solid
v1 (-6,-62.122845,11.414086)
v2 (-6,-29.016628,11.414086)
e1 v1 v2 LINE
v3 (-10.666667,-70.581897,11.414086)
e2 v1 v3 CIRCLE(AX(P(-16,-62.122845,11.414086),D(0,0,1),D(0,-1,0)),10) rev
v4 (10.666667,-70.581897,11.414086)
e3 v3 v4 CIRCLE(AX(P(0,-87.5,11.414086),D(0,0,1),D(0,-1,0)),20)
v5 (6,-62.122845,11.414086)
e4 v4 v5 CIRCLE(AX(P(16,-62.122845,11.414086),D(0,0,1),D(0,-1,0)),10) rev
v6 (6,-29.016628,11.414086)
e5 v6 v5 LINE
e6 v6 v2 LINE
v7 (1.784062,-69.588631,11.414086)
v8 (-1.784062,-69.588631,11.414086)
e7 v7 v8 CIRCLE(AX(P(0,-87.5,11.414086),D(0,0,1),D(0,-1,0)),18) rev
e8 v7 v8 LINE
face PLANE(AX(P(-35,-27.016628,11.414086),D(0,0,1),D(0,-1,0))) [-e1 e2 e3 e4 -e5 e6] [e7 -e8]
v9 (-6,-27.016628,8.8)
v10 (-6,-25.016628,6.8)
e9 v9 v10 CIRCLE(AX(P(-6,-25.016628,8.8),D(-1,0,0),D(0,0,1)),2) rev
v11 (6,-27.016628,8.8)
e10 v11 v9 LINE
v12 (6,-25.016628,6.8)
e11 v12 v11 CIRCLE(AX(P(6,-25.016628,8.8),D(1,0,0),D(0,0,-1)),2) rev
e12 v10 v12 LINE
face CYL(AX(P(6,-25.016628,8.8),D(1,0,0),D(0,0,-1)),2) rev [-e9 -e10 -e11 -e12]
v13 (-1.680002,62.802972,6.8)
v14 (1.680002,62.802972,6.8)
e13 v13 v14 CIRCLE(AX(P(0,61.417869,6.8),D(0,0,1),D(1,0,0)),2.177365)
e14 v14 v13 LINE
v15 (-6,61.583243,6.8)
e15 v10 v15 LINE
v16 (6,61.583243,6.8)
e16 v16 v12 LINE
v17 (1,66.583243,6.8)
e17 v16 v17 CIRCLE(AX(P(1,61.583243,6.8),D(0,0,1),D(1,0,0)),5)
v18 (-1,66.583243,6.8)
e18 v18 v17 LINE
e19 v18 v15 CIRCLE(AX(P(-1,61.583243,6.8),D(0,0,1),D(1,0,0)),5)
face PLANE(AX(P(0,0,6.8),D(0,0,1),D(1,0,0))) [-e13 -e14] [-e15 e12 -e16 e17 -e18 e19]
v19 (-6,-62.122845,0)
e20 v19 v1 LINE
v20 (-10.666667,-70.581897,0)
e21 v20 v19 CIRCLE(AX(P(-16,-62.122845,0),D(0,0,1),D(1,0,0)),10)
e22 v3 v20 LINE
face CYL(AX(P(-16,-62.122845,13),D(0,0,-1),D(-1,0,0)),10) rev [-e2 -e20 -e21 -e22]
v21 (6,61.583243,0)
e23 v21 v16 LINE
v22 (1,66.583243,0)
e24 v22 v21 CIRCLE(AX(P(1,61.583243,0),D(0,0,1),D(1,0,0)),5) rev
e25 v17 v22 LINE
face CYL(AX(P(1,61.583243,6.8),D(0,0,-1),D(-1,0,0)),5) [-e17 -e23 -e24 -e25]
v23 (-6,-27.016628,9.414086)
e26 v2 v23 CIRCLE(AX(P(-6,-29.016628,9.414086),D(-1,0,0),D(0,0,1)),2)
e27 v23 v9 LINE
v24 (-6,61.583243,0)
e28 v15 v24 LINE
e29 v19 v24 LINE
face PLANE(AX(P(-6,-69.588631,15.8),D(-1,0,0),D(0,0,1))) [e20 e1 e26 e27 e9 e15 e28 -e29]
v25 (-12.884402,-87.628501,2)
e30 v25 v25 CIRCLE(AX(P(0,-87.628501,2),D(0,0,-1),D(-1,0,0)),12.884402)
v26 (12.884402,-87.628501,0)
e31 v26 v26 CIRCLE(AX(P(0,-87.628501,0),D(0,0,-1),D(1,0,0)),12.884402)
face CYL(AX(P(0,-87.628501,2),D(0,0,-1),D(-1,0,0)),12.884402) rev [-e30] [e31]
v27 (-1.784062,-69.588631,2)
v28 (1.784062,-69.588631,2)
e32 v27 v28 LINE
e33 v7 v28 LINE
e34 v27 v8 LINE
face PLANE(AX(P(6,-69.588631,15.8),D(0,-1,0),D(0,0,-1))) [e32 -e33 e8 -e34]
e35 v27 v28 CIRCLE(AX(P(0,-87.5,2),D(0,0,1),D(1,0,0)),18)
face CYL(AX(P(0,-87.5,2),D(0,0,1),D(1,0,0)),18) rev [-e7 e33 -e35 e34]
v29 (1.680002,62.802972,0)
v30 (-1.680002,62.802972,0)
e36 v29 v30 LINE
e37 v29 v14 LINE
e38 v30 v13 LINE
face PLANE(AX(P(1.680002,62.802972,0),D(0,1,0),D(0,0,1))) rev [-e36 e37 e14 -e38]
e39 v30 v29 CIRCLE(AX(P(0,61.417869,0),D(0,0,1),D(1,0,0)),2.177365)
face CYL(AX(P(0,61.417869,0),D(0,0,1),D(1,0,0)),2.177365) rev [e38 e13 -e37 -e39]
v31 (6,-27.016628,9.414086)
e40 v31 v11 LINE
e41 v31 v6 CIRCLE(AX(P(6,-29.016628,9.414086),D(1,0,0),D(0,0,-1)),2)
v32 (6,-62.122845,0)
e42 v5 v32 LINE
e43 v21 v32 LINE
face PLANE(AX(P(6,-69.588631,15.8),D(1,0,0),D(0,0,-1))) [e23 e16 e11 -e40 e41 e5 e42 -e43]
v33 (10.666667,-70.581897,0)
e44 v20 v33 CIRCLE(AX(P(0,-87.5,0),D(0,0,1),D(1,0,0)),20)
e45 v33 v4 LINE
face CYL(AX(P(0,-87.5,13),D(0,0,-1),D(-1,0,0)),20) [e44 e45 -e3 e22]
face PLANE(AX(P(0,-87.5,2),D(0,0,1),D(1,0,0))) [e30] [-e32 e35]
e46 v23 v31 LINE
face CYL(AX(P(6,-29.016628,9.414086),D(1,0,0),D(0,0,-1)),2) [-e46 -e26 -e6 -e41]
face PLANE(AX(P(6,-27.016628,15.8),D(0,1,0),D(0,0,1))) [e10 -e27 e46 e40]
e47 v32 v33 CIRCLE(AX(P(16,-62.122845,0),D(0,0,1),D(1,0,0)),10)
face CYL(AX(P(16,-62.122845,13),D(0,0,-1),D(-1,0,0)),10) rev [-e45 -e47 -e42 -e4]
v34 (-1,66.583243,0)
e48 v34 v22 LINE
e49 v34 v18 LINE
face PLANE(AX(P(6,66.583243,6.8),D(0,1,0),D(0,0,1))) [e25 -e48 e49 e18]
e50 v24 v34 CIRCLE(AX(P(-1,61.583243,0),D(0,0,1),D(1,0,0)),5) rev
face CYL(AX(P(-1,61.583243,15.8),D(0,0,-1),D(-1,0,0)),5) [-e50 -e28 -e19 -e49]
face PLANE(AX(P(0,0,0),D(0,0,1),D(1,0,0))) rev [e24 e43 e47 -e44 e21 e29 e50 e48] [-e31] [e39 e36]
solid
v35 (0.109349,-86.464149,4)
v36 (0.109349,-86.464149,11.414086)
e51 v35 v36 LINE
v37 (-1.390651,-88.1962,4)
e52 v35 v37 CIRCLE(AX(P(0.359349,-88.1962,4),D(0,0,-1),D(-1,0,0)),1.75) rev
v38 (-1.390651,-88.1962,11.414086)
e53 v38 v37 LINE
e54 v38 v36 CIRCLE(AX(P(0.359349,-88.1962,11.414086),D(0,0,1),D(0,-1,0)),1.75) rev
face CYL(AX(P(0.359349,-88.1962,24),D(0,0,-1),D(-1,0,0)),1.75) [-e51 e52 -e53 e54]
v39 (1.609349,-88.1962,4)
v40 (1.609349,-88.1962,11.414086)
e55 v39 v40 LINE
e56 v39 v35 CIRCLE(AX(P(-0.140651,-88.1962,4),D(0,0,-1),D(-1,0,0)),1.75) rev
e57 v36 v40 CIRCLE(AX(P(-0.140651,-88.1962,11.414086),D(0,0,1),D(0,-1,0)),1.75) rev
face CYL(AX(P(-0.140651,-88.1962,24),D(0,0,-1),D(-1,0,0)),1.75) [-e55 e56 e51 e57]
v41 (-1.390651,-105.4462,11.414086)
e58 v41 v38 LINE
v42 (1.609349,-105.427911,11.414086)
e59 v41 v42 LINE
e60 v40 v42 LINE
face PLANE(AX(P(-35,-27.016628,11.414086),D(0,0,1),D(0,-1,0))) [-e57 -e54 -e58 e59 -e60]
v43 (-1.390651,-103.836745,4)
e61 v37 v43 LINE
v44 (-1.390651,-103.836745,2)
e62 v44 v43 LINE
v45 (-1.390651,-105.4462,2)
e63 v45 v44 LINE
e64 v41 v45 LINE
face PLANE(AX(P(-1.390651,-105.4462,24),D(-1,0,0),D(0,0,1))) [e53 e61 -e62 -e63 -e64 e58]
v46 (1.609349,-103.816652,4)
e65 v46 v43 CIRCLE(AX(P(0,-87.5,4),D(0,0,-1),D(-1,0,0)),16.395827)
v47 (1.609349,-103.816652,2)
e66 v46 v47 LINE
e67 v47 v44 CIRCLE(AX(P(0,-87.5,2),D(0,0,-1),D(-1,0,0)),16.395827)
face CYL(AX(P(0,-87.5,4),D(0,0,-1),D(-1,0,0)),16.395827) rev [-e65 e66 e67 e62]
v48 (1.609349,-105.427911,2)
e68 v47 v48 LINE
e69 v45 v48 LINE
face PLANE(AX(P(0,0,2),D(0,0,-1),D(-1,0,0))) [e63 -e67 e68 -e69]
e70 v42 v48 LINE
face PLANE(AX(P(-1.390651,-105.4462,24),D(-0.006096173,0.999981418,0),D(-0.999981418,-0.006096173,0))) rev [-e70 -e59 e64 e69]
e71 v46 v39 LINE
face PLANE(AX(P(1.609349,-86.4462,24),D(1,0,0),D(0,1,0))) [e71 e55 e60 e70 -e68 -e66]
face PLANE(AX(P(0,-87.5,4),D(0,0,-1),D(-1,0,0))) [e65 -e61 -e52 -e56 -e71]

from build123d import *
from build123d.topology import SkipClean

# Parameters (mm, degrees)
BOSS_EXTRUDE1_DEPTH      = 13
BOSS_EXTRUDE1_2_DEPTH    = 13
BOSS_EXTRUDE2_DEPTH      = 13
CUT_EXTRUDE1_DEPTH       = 13
SKETCH3_W                = 6.626848164
SKETCH3_H                = 19.420298156
CUT_EXTRUDE2_DEPTH       = 13
FILLET1_R                = 10
SKETCH4_R                = 20
BOSS_EXTRUDE3_DEPTH      = 13
CUT_EXTRUDE3_DEPTH       = 13
SKETCH6_R                = 18
CUT_EXTRUDE4_DEPTH       = 24
BOSS_EXTRUDE7_DEPTH      = 22
FILLET5_R                = 1.75
FILLET6_R                = 20
SKETCH13_W               = 6.626848164
SKETCH13_H               = 84.326545424
CUT_EXTRUDE8_DEPTH       = 22
FILLET8_R                = 21.5
FILLET9_R                = 21.5
SKETCH14_W               = 17.060891399
SKETCH14_H               = 46.716771418
CUT_EXTRUDE10_DEPTH      = 22
SKETCH23_R               = 16.395826628
CUT_EXTRUDE14_DEPTH      = 4
BOSS_EXTRUDE16_DEPTH     = 2
SKETCH25_R               = 20.128500803
CUT_EXTRUDE15_DEPTH      = 9
SKETCH26_W               = 8.848519257
SKETCH26_H               = 26
CUT_EXTRUDE16_DEPTH      = 9
CUT_EXTRUDE17_DEPTH      = 9
FILLET21_R               = 3.5
SKETCH28_W               = 12
SKETCH28_H               = 42.572003563
BOSS_EXTRUDE20_DEPTH     = 15.8
BOSS_EXTRUDE21_START     = -6.8
SKETCH30_W               = 12
SKETCH30_H               = 93.599870645
BOSS_EXTRUDE21_DEPTH     = 6.8
FILLET23_R               = 5
BOSS_EXTRUDE22_DEPTH     = 6.8
CUT_EXTRUDE18_DEPTH      = 29
CUT_EXTRUDE18_DEPTH_BACK = 41
SKETCH34_W               = 5.585914081
SKETCH34_H               = 80.48337208
FILLET27_R               = 2
FILLET28_R               = 10
BOSS_EXTRUDE24_DEPTH     = 6.8


with BuildPart() as part:
    # Sketch1 → Boss-Extrude1 (new body)
    with BuildSketch(Plane.XY):
        with BuildLine():
            Line((4, -87.5), (-4, -87.5))
            Line((-4, -87.5), (-4, -67.904082058))
            ThreePointArc((-4, -67.904082058), (0, -107.5), (4, -67.904082058))
            Line((4, -67.904082058), (4, -87.5))
        make_face()
    extrude(amount=BOSS_EXTRUDE1_DEPTH)



with BuildPart() as body_2:
    # Sketch1 → Boss-Extrude1 2 (new body)
    with BuildSketch(Plane.XY):
        with BuildLine():
            Line((-4, 87.5), (-4, -67.904082058))
            ThreePointArc((-4, -67.904082058), (0, -67.5), (4, -67.904082058))
            Line((4, -67.904082058), (4, 87.5))
            ThreePointArc((4, 87.5), (0, 91.5), (-4, 87.5))
        make_face()
    extrude(amount=BOSS_EXTRUDE1_2_DEPTH)


with BuildPart() as part_1:
    add(part.part)

    add(body_2.part)  # Boss-Extrude2 merges body 2
    # Sketch1<3> → Boss-Extrude2 (add)
    with BuildSketch(Plane.XY):
        with BuildLine():
            Line((-4, -67.904082058), (-4, -87.5))
            Line((-4, -87.5), (4, -87.5))
            Line((4, -87.5), (4, -67.904082058))
            ThreePointArc((4, -67.904082058), (0, -67.5), (-4, -67.904082058))
        make_face()
        with BuildLine():
            Line((4, -87.5), (-4, -87.5))
            Line((-4, -87.5), (-4, -67.904082058))
            ThreePointArc((-4, -67.904082058), (-12.649110641, -102.991933385), (20, -87.5))
            ThreePointArc((20, -87.5), (15.491933385, -74.850889359), (4, -67.904082058))
            Line((4, -67.904082058), (4, -87.5))
        make_face()
    extrude(amount=BOSS_EXTRUDE2_DEPTH)

    # Sketch2 → Cut-Extrude1 (cut)
    with BuildSketch(Plane.XY.offset(13)):
        with BuildLine():
            Line((1.836704547, 90.02826846), (-1.836704547, 90.02826846))
            ThreePointArc((-1.836704547, 90.02826846), (-1.418788795, 84.715639507), (3.125, 87.5))
            ThreePointArc((3.125, 87.5), (2.784360493, 88.918788795), (1.836704547, 90.02826846))
        make_face()
    extrude(amount=-CUT_EXTRUDE1_DEPTH, mode=Mode.SUBTRACT)

    # Sketch3 → Cut-Extrude2 (cut)
    with BuildSketch(Plane(origin=(4, 0, 0), x_dir=(0, 0, -1), z_dir=(1, 0, 0))):
        with Locations((-9.686575918, 81.789850922)):
            Rectangle(SKETCH3_W, SKETCH3_H)
    extrude(amount=-CUT_EXTRUDE2_DEPTH, mode=Mode.SUBTRACT)

    # Fillet1
    # the kernel refuses this fillet: 10 mm, written as the material it adds along each edge
    with BuildSketch(Plane(origin=(4, 72.079701844, 6.373151836), x_dir=(0, 1, 0), z_dir=(-1, 0, 0))) as fillet1_piece_1:
        with BuildLine():
            CenterArc((9.413917712, -10), FILLET1_R, 90, 70.286615286)
            Line((0, -6.626848164), (-0.188278354, -6.559385127))
            ThreePointArc((-0.188278354, -6.559385127), (-0.2, -3.313424082), (-0.2, 0))
            Line((-0.2, 0), (0, 0.2))
            Line((0, 0.2), (9.413917712, 0.2))
            Line((9.413917712, 0.2), (9.413917712, 0))
        make_face()
    extrude(amount=8)

    # Sketch4 → Boss-Extrude3 (add)
    with BuildSketch(Plane.XY.offset(13)):
        with Locations(Location((0, -87.5, 0), (0, 0, 101.536959033))):
            Circle(SKETCH4_R)
    extrude(amount=BOSS_EXTRUDE3_DEPTH)

    # Sketch5 → Cut-Extrude3 (cut)
    with BuildSketch(Plane(origin=(4, 0, 0), x_dir=(0, 0, -1), z_dir=(1, 0, 0))):
        with BuildLine():
            Line((-13, 61.057159029), (-13, 87.5))
            Line((-13, 87.5), (-6.373151836, 87.5))
            ThreePointArc((-6.373151836, 87.5), (-7.529351989, 73.73795699), (-13, 61.057159029))
        make_face()
    extrude(amount=-CUT_EXTRUDE3_DEPTH, mode=Mode.SUBTRACT)

    # Sketch6 → Cut-Extrude4 (cut)
    with BuildSketch(Plane.XY.offset(26)):
        with Locations((0, -87.5)):
            Circle(SKETCH6_R)
    extrude(amount=-CUT_EXTRUDE4_DEPTH, mode=Mode.SUBTRACT)

    # Fillet6
    fillet6_edges = [part_1.edges().sort_by_distance(p)[0] for p in [
        (0, 61.057159029, 13),
    ]]
    fillet(fillet6_edges, radius=FILLET6_R)

    # Sketch13 → Cut-Extrude8 (cut)
    with BuildSketch(Plane.ZY.offset(4)):
        with Locations((9.686575918, 45.336727288)):
            Rectangle(SKETCH13_W, SKETCH13_H)
    extrude(amount=-CUT_EXTRUDE8_DEPTH, mode=Mode.SUBTRACT)

    # Fillet8
    # the kernel refuses this fillet: 21.5 mm, written as the material it adds along each edge
    with BuildSketch(Plane(origin=(-4, 3.173454576, 6.373151836), x_dir=(0, 1, 0), z_dir=(1, 0, 0))) as fillet8_piece_1:
        with BuildLine():
            CenterArc((15.525442166, 21.5), FILLET8_R, 223.770740898, 46.229259102)
            Line((0, 6.626848164), (-0.310508843, 6.329385127))
            ThreePointArc((-0.310508843, 6.329385127), (-0.43, 3.313424082), (-0.43, 0))
            Line((-0.43, 0), (0, -0.43))
            Line((0, -0.43), (15.525442166, -0.43))
            Line((15.525442166, -0.43), (15.525442166, 0))
        make_face()
    extrude(amount=8)

    # Fillet9
    fillet9_edges = [part_1.edges().sort_by_distance(p)[0] for p in [
        (0, 3.173454576, 13),
    ]]
    fillet(fillet9_edges, radius=FILLET9_R)

    # Sketch14 → Cut-Extrude10 (cut)
    with BuildSketch(Plane.ZY.offset(4)):
        with Locations((14.903597536, -4.659488967)):
            Rectangle(SKETCH14_W, SKETCH14_H)
    extrude(amount=-CUT_EXTRUDE10_DEPTH, mode=Mode.SUBTRACT)


with BuildPart() as body_2_2:
    # Sketch8 → Boss-Extrude7 (new body)
    with BuildSketch(Plane.XY.offset(2)):
        Polygon((-1.390650573, -105.446199904), (-1.390650573, -86.446199904), (1.609349427, -86.446199904), (1.609349427, -105.427911045), align=None)
    extrude(amount=BOSS_EXTRUDE7_DEPTH)

    # Fillet5
    # the kernel refuses this fillet: 1.75 mm, written as the material it takes off along each edge
    with BuildSketch(Plane(origin=(1.609349427, -86.446199904, -2.375), x_dir=(-1, 0, 0), z_dir=(0, 0, 1)), Plane(origin=(-1.390650573, -86.446199904, -2.375), x_dir=(0, -1, 0), z_dir=(0, 0, 1))) as fillet5_piece_1:
        with BuildLine():
            CenterArc((FILLET5_R, FILLET5_R), FILLET5_R, 180, 90)
            Line((0, FILLET5_R), (0, 0))
            Line((0, 0), (FILLET5_R, 0))
        make_face()
    extrude(amount=30.75, mode=Mode.SUBTRACT)


with BuildPart() as cut_extrude14_tool:
    # Sketch23 → Cut-Extrude14 (new body)
    with BuildSketch(Plane(origin=(0, 0, 0), x_dir=(-1, 0, 0), z_dir=(0, 0, -1))):
        with Locations((0, -87.5)):
            Circle(SKETCH23_R)
    extrude(amount=-CUT_EXTRUDE14_DEPTH)


with BuildPart() as part_2:
    add(part_1.part)

    # Cut-Extrude14: cut by cut_extrude14_tool
    add(cut_extrude14_tool.part, mode=Mode.SUBTRACT)

    # Sketch24 → Boss-Extrude16 (add)
    with BuildSketch(Plane(origin=(0, 0, 0), x_dir=(-1, 0, 0), z_dir=(0, 0, -1))):
        with BuildLine():
            ThreePointArc((0, -71.104173372), (-16.395826628, -87.5), (0, -103.895826628))
            ThreePointArc((0, -103.895826628), (16.395826628, -87.5), (0, -71.104173372))
        make_face()
        with BuildLine():
            ThreePointArc((0, -74.744099259), (12.884401545, -87.628500803), (0, -100.512902348))
            ThreePointArc((0, -100.512902348), (-12.884401545, -87.628500803), (0, -74.744099259))
        make_face(mode=Mode.SUBTRACT)
    extrude(amount=-BOSS_EXTRUDE16_DEPTH)


with BuildPart() as body_2_2_1:
    add(body_2_2.part)

    # Cut-Extrude14: cut by cut_extrude14_tool
    add(cut_extrude14_tool.part, mode=Mode.SUBTRACT)


with BuildPart() as cut_extrude15_tool:
    # Sketch25 → Cut-Extrude15 (new body)
    with BuildSketch(Plane.XY.offset(26)):
        with Locations((0, -87.628500803)):
            Circle(SKETCH25_R)
    extrude(amount=-CUT_EXTRUDE15_DEPTH)


with BuildPart() as part_3:
    add(part_2.part)

    # Cut-Extrude15: cut by cut_extrude15_tool
    add(cut_extrude15_tool.part, mode=Mode.SUBTRACT)

    # Sketch26 → Cut-Extrude16 (cut)
    with BuildSketch(Plane.XY.offset(6.373151836)):
        with Locations((0.424259629, 79.373396417)):
            Rectangle(SKETCH26_W, SKETCH26_H)
    extrude(amount=-CUT_EXTRUDE16_DEPTH, mode=Mode.SUBTRACT)

    # Sketch27 → Cut-Extrude17 (cut)
    with BuildSketch(Plane.XY.offset(6.373151836)):
        with BuildLine():
            Line((2.132304127, 63.840504789), (-2.132304127, 63.840504789))
            ThreePointArc((-2.132304127, 63.840504789), (-1.329315567, 58.476984755), (3.22736468, 61.417869469))
            ThreePointArc((3.22736468, 61.417869469), (2.940884714, 62.747185037), (2.132304127, 63.840504789))
        make_face()
    extrude(amount=-CUT_EXTRUDE17_DEPTH, mode=Mode.SUBTRACT)

    # Fillet21
    fillet21_edges = [part_3.edges().sort_by_distance(p)[0] for p in [
        (4, 66.373396417, 3.186575918),
        (-4, 66.373396417, 3.186575918),
    ]]
    fillet(fillet21_edges, radius=FILLET21_R)

    # Sketch28 → Boss-Extrude20 (add)
    with BuildSketch(Plane(origin=(0, 0, 0), x_dir=(-1, 0, 0), z_dir=(0, 0, -1))):
        with Locations((0, -48.302629702)):
            Rectangle(SKETCH28_W, SKETCH28_H)
    extrude(amount=-BOSS_EXTRUDE20_DEPTH)

    # Sketch30 → Boss-Extrude21 (add)
    with SkipClean():  # the faces are left unmerged after this step: merging them gives an invalid solid
        with BuildSketch(Plane(origin=(0, 0, 0), x_dir=(-1, 0, 0), z_dir=(0, 0, -1)).offset(BOSS_EXTRUDE21_START)):
            with Locations((0, 19.783307403)):
                Rectangle(SKETCH30_W, SKETCH30_H)
            with BuildLine():
                Line((2.132304127, 63.840504789), (-2.132304127, 63.840504789))
                ThreePointArc((-2.132304127, 63.840504789), (0, 58.190504789), (2.132304127, 63.840504789))
            make_face(mode=Mode.SUBTRACT)
        extrude(amount=BOSS_EXTRUDE21_DEPTH)

    # Fillet23
    fillet23_edges = [part_3.edges().sort_by_distance(p)[0] for p in [
        (6, 66.583242725, 3.4),
        (-6, 66.583242725, 3.4),
    ]]
    fillet(fillet23_edges, radius=FILLET23_R)

    # Sketch33 → Boss-Extrude22 (add)
    with BuildSketch(Plane.XY.offset(6.8)):
        with BuildLine():
            Line((-2.132304127, 63.840504789), (2.132304127, 63.840504789))
            ThreePointArc((2.132304127, 63.840504789), (0, 58.190504789), (-2.132304127, 63.840504789))
        make_face()
        with BuildLine():
            Line((-2.09926937, 63.802972072), (2.09926937, 63.802972072))
            ThreePointArc((2.09926937, 63.802972072), (0, 58.240504789), (-2.09926937, 63.802972072))
        make_face(mode=Mode.SUBTRACT)
    extrude(amount=-BOSS_EXTRUDE22_DEPTH)


with BuildPart() as body_2_2_2:
    add(body_2_2_1.part)

    # Cut-Extrude15: cut by cut_extrude15_tool
    add(cut_extrude15_tool.part, mode=Mode.SUBTRACT)


with BuildPart() as cut_extrude18_tool:
    # Sketch34 → Cut-Extrude18 (new, two sides: drawn at the far end of the back side and taken through both)
    with BuildSketch(Plane.ZY.offset(6).offset(-CUT_EXTRUDE18_DEPTH_BACK)):
        with Locations((14.20704296, -67.25831396)):
            Rectangle(SKETCH34_W, SKETCH34_H)
    extrude(amount=CUT_EXTRUDE18_DEPTH + CUT_EXTRUDE18_DEPTH_BACK)


with BuildPart() as part_4:
    add(part_3.part)

    # Cut-Extrude18: cut by cut_extrude18_tool
    add(cut_extrude18_tool.part, mode=Mode.SUBTRACT)

    # Fillet27
    fillet27_edges = [part_4.edges().sort_by_distance(p)[0] for p in [
        (0, -27.01662792, 6.8),
        (0, -27.01662792, 11.414085919),
    ]]
    fillet(fillet27_edges, radius=FILLET27_R)

    # Fillet28
    fillet28_edges = [part_4.edges().sort_by_distance(p)[0] for p in [
        (6, -68.421215972, 5.707042959),
        (-6, -68.421215972, 5.707042959),
    ]]
    fillet(fillet28_edges, radius=FILLET28_R)

    # Sketch35 → Boss-Extrude24 (add)
    with BuildSketch(Plane.XY.offset(6.8)):
        with BuildLine():
            Line((2.09926937, 63.802972072), (-2.09926937, 63.802972072))
            ThreePointArc((-2.09926937, 63.802972072), (0, 58.240504789), (2.09926937, 63.802972072))
        make_face()
        with BuildLine():
            Line((1.680002301, 62.802972072), (-1.680002301, 62.802972072))
            ThreePointArc((-1.680002301, 62.802972072), (0, 59.240504789), (1.680002301, 62.802972072))
        make_face(mode=Mode.SUBTRACT)
    extrude(amount=-BOSS_EXTRUDE24_DEPTH)


with BuildPart() as body_2_2_3:
    add(body_2_2_2.part)

    # Cut-Extrude18: cut by cut_extrude18_tool
    add(cut_extrude18_tool.part, mode=Mode.SUBTRACT)


solid = Compound([part_4.part, body_2_2_3.part])
